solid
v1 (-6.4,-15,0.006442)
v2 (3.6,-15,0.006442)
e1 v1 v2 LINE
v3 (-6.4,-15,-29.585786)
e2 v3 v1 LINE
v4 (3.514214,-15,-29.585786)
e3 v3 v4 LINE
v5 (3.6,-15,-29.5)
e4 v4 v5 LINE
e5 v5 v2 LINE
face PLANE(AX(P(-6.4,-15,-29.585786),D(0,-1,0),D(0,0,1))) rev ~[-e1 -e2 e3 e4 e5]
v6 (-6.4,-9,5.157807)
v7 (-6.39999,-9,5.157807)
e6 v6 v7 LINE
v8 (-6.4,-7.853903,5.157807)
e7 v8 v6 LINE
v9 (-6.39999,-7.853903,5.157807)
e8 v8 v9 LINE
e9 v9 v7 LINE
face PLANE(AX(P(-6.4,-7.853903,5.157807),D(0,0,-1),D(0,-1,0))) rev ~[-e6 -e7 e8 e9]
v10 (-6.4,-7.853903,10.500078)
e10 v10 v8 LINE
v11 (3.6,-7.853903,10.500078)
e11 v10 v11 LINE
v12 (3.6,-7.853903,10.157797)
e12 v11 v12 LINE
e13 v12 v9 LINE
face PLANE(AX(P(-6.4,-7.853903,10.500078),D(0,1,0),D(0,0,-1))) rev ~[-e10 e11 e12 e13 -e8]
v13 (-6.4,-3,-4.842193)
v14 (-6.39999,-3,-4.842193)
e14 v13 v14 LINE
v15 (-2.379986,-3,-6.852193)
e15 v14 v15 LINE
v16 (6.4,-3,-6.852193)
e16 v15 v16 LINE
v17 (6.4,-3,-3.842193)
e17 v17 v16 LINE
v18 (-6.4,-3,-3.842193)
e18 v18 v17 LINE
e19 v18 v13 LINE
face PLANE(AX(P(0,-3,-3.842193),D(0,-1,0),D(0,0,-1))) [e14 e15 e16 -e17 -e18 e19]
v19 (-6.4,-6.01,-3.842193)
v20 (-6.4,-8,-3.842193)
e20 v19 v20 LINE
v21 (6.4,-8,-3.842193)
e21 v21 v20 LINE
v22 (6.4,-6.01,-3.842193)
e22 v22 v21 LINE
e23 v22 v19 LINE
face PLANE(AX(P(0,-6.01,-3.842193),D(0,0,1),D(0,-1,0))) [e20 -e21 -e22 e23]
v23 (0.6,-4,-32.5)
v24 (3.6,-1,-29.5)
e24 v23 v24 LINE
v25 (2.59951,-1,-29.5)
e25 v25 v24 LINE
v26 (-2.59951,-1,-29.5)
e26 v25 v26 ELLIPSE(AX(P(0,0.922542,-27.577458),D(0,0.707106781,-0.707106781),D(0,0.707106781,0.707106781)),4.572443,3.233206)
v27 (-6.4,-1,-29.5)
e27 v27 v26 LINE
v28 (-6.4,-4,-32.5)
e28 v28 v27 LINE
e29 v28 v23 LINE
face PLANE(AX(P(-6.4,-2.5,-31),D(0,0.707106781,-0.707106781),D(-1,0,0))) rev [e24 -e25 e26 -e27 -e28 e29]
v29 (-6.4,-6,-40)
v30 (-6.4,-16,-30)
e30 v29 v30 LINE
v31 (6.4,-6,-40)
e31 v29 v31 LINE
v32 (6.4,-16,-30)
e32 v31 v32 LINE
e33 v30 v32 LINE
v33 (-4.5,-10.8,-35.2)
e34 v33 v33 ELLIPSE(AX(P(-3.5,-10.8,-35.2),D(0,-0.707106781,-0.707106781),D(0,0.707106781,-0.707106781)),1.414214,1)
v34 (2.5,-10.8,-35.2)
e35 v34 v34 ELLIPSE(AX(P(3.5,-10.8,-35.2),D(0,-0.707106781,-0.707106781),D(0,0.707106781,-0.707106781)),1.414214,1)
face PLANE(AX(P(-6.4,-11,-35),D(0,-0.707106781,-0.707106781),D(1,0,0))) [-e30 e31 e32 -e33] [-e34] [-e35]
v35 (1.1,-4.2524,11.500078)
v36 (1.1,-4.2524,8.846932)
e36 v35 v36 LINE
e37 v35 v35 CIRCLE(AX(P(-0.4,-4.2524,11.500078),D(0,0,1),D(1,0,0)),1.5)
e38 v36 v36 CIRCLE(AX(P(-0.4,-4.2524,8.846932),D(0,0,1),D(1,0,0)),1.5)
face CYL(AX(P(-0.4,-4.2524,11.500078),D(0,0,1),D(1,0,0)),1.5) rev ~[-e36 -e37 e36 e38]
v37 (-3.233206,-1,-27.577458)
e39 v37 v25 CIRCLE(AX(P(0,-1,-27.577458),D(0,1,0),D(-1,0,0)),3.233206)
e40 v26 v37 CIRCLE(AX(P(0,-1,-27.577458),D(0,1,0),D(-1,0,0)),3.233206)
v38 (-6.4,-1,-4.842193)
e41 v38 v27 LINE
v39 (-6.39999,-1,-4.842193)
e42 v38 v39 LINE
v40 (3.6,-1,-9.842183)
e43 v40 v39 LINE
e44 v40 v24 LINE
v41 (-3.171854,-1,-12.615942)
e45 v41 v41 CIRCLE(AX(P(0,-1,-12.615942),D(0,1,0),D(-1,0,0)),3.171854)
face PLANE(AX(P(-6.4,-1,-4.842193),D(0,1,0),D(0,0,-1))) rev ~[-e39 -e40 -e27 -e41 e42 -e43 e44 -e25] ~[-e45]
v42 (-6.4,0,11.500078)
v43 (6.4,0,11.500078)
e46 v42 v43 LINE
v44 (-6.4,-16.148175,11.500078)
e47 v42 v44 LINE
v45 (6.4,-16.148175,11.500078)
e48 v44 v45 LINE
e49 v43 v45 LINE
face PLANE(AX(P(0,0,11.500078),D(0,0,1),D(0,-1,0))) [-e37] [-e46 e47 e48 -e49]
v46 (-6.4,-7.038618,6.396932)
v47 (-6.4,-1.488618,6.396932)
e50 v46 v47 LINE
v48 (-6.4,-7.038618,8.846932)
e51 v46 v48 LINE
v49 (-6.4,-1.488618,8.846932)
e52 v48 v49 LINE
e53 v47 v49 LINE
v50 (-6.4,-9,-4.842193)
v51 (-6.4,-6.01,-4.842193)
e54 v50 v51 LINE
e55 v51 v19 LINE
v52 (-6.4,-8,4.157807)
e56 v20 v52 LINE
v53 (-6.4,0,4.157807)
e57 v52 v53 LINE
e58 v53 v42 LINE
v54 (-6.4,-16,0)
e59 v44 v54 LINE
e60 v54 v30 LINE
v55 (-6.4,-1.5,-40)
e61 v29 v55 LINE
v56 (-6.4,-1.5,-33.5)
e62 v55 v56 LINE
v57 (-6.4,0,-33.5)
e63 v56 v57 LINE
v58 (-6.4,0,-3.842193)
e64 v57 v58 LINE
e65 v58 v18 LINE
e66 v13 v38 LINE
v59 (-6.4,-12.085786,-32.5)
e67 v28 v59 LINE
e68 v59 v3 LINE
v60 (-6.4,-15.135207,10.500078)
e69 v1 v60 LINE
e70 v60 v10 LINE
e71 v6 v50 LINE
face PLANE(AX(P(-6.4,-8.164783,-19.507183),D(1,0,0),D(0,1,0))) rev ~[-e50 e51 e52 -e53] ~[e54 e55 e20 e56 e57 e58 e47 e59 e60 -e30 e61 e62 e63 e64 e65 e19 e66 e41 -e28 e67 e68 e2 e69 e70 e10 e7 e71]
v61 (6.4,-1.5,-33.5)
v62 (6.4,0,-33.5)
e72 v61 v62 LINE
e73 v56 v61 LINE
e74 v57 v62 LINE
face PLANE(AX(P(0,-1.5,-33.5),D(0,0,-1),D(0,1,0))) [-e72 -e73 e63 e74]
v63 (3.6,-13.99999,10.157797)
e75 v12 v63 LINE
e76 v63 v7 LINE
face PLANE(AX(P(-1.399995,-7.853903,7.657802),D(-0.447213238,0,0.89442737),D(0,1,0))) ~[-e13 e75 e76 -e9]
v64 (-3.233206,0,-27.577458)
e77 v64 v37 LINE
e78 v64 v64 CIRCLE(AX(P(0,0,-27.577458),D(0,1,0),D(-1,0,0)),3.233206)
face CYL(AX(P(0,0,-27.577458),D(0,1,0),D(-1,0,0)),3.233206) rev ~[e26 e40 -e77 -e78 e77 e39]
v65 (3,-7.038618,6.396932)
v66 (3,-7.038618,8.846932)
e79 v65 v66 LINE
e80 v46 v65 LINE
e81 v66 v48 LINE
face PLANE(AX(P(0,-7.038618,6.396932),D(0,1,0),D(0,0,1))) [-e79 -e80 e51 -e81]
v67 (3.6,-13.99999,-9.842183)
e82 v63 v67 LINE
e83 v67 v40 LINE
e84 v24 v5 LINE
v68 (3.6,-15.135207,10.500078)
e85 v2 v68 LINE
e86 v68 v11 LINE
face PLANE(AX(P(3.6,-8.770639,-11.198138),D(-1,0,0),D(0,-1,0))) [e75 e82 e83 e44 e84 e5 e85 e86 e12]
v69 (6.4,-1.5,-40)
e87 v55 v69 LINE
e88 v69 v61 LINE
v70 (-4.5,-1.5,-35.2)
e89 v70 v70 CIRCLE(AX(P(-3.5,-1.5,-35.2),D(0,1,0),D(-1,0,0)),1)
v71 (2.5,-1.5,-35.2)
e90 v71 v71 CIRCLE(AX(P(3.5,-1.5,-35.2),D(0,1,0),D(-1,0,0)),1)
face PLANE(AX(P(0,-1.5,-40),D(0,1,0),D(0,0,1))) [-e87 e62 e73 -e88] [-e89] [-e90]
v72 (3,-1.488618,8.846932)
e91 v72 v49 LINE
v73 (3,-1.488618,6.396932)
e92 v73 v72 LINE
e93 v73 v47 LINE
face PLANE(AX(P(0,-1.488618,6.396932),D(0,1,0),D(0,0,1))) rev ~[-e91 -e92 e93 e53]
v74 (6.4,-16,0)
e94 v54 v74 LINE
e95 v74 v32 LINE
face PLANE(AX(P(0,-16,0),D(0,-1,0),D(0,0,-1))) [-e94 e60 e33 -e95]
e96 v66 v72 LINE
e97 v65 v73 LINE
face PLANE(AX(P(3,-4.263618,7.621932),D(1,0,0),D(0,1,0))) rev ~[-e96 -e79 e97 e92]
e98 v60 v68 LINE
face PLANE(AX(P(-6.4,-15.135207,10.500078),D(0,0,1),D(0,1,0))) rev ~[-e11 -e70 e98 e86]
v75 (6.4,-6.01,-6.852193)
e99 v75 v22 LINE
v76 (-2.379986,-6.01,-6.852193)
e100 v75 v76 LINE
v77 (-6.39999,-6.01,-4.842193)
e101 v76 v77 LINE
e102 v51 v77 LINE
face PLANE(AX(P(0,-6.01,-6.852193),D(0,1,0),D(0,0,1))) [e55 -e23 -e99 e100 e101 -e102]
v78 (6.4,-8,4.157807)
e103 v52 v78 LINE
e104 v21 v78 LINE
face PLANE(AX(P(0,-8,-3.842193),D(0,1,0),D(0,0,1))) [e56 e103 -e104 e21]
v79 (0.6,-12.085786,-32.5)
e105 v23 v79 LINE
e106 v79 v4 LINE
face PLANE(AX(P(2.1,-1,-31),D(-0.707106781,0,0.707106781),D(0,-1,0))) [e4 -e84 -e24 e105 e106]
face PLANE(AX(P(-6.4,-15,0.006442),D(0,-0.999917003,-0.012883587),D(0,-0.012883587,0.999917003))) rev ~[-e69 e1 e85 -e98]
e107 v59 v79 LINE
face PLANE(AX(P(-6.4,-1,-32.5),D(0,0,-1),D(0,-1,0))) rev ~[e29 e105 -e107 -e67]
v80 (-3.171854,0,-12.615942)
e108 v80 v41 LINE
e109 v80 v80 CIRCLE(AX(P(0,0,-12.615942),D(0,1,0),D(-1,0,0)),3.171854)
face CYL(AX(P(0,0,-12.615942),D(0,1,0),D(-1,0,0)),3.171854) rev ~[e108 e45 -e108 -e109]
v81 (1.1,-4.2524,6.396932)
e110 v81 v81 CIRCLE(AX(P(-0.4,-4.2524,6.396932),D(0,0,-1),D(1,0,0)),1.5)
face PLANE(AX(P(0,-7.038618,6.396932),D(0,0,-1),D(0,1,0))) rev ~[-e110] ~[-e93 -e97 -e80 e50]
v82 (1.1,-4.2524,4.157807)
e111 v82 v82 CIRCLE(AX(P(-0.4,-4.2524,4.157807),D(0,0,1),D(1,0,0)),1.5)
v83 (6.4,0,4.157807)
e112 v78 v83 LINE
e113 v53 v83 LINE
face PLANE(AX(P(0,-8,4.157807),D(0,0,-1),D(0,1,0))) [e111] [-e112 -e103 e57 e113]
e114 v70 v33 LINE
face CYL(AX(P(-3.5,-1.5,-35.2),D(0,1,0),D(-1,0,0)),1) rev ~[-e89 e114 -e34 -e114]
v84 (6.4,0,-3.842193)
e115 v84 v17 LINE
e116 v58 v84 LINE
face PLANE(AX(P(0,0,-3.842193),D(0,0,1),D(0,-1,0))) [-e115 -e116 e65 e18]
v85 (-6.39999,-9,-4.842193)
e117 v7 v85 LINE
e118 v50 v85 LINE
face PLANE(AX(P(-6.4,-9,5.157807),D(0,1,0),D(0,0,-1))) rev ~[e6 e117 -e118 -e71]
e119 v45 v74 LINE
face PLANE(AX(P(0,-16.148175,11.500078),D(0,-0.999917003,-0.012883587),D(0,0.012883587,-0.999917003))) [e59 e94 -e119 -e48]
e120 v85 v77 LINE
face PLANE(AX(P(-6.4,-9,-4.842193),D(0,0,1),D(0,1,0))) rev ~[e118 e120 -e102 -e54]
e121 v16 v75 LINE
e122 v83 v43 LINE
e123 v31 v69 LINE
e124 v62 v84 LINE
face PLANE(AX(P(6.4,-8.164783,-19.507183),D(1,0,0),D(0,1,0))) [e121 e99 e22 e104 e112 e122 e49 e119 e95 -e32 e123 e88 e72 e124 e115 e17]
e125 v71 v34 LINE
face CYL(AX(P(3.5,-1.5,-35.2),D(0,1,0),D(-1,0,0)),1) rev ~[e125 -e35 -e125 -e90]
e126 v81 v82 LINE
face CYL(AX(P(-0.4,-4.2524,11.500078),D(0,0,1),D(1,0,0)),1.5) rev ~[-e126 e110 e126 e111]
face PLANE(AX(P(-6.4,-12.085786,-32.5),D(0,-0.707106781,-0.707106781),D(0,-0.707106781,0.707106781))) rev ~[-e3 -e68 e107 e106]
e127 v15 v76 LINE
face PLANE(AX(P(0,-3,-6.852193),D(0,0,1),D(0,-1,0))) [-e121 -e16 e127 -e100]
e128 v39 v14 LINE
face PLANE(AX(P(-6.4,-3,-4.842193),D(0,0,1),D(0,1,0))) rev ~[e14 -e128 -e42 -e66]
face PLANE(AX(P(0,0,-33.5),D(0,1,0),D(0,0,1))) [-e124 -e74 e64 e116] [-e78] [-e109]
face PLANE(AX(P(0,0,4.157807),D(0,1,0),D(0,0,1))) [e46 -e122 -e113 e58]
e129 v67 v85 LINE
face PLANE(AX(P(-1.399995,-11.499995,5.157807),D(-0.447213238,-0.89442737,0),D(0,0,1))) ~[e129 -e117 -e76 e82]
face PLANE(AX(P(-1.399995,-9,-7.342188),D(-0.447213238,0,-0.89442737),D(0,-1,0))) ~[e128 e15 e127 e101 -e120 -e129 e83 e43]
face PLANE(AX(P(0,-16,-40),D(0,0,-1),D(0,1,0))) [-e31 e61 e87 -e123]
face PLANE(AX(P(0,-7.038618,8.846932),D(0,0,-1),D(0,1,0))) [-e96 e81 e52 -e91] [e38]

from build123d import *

# Parameters (mm, degrees)
F0_W      = 5.55
F0_H      = 2.45
F1_DEPTH  = 6.4
F3_DEPTH  = 9.3
F2_R      = 1.5
F4_DEPTH  = 11.8
F5_DEPTH  = 3
F6_SIZE   = 10
F9_DEPTH  = 10
F10_R     = 1
F11_DEPTH = 16.7
F13_SIZE  = 3
F12_R     = 3.1718540483
F12_R_2   = 3.2332055741
F14_DEPTH = 11.3
F15_SIZE2 = 9.99999
F15_SIZE  = 4.99999


# Not quite as in the source:
# - a fillet or chamfer is up to 0.001 mm smaller than in the source, because OpenCascade refuses the exact size
# - a feature names something its author has since deleted; it is built from what else it names


with BuildPart() as f1:
    # F0 (on Right) → F1 (new body, symmetric)
    with BuildSketch(Plane.YZ):
        Polygon((-8, -3.8421934836), (-8, 0), (-16, 0), (-16, -40), (-1.5, -40), (-1.5, -33.5), (0, -33.5), (0, -3.8421934836), (-3, -3.8421934836), (-3, -6.8521934836), (-6.01, -6.8521934836), (-6.01, -3.8421934836), align=None)
        Polygon((-8, 4.1578065164), (0, 4.1578065164), (0, 8.6438981816), (0, 11.5000782534), (-16.1481745615, 11.5000782534), (-16, 0), (-8, 0), align=None)
        with Locations((-4.2636177904, 7.6219322528)):
            Rectangle(F0_W, F0_H, mode=Mode.SUBTRACT)
        with Locations((-4.2636177904, 7.6219322528)):
            Rectangle(F0_W, F0_H)
    extrude(amount=F1_DEPTH, both=True)

    # F0 (on Right) → F3 (cut)
    with BuildSketch(Plane.YZ):
        with Locations((-4.2636177904, 7.6219322528)):
            Rectangle(F0_W, F0_H)
    extrude(amount=-F3_DEPTH, mode=Mode.SUBTRACT)

    # F2 (on face) → F4 (cut)
    with BuildSketch(Plane.XY.offset(11.5000782534)):
        with Locations((-0.4, -4.2524)):
            Circle(F2_R)
    extrude(amount=-F4_DEPTH, mode=Mode.SUBTRACT)

    # F0 (on Right) → F5 (cut)
    with BuildSketch(Plane.YZ):
        with Locations((-4.2636177904, 7.6219322528)):
            Rectangle(F0_W, F0_H)
    extrude(amount=F5_DEPTH, mode=Mode.SUBTRACT)

    # F6
    f6_edges = [f1.edges().sort_by_distance(p)[0] for p in [
        (0, -16, -40),
    ]]
    chamfer(f6_edges, length=F6_SIZE)

    # F7 (on face) → F9 (cut)
    with BuildSketch(Plane(origin=(-6.4, 0, 0), x_dir=(0, -1, 0), z_dir=(-1, 0, 0))):
        Polygon((3, -6.8521934836), (3, -4.8421934836), (1, -4.8421934836), (1, -14.3586024642), (1, -21.1353842169), (1, -32.5), (2.5, -32.5), (12.0857864376, -32.5), (15, -29.5857864376), (15, 0.006442061), (15.135206901, 10.5000782534), (7.8539028764, 10.5000782534), (7.8539028764, 5.1578065164), (9, 5.1578065164), (9, -4.8421934836), (6.01, -4.8421934836), (6.01, -6.8521934836), align=None)
    extrude(amount=-F9_DEPTH, mode=Mode.SUBTRACT)

    # F10 (on face) → F11 (cut)
    with BuildSketch(Plane(origin=(0, -1.5, 0), x_dir=(-1, 0, 0), z_dir=(0, 1, 0))):
        with Locations((-3.5, -35.2)):
            Circle(F10_R)
        with Locations((3.5, -35.2)):
            Circle(F10_R)
    extrude(amount=-F11_DEPTH, mode=Mode.SUBTRACT)

    # F13
    f13_edges = [f1.edges().sort_by_distance(p)[0] for p in [
        (3.6, -6.542893, -32.5),
        (-1.4, -1, -32.5),
    ]]
    chamfer(f13_edges, length=F13_SIZE)

    # F12 (on face) → F14 (cut)
    with BuildSketch(Plane(origin=(0, 0, 0), x_dir=(-1, 0, 0), z_dir=(0, 1, 0))):
        with Locations((0, -12.6159423962)):
            Circle(F12_R)
        with Locations((0, -27.5774579495)):
            Circle(F12_R_2)
    extrude(amount=-F14_DEPTH, mode=Mode.SUBTRACT)

    # F15 (size 5 and 10 in the source; OpenCascade refuses exactly that, so slightly less here)
    f15_edges = [f1.edges().sort_by_distance(p)[0] for p in [
        (3.6, -7.505, -4.842193),
        (3.6, -9, 0.157807),
        (3.6, -8.426951, 5.157807),
    ]]
    f15_side = f1.faces().sort_by_distance((3.6, -8.906235, -12.735974))[0]
    chamfer(f15_edges, length=F15_SIZE, length2=F15_SIZE2, reference=f15_side)


solid = f1.part
